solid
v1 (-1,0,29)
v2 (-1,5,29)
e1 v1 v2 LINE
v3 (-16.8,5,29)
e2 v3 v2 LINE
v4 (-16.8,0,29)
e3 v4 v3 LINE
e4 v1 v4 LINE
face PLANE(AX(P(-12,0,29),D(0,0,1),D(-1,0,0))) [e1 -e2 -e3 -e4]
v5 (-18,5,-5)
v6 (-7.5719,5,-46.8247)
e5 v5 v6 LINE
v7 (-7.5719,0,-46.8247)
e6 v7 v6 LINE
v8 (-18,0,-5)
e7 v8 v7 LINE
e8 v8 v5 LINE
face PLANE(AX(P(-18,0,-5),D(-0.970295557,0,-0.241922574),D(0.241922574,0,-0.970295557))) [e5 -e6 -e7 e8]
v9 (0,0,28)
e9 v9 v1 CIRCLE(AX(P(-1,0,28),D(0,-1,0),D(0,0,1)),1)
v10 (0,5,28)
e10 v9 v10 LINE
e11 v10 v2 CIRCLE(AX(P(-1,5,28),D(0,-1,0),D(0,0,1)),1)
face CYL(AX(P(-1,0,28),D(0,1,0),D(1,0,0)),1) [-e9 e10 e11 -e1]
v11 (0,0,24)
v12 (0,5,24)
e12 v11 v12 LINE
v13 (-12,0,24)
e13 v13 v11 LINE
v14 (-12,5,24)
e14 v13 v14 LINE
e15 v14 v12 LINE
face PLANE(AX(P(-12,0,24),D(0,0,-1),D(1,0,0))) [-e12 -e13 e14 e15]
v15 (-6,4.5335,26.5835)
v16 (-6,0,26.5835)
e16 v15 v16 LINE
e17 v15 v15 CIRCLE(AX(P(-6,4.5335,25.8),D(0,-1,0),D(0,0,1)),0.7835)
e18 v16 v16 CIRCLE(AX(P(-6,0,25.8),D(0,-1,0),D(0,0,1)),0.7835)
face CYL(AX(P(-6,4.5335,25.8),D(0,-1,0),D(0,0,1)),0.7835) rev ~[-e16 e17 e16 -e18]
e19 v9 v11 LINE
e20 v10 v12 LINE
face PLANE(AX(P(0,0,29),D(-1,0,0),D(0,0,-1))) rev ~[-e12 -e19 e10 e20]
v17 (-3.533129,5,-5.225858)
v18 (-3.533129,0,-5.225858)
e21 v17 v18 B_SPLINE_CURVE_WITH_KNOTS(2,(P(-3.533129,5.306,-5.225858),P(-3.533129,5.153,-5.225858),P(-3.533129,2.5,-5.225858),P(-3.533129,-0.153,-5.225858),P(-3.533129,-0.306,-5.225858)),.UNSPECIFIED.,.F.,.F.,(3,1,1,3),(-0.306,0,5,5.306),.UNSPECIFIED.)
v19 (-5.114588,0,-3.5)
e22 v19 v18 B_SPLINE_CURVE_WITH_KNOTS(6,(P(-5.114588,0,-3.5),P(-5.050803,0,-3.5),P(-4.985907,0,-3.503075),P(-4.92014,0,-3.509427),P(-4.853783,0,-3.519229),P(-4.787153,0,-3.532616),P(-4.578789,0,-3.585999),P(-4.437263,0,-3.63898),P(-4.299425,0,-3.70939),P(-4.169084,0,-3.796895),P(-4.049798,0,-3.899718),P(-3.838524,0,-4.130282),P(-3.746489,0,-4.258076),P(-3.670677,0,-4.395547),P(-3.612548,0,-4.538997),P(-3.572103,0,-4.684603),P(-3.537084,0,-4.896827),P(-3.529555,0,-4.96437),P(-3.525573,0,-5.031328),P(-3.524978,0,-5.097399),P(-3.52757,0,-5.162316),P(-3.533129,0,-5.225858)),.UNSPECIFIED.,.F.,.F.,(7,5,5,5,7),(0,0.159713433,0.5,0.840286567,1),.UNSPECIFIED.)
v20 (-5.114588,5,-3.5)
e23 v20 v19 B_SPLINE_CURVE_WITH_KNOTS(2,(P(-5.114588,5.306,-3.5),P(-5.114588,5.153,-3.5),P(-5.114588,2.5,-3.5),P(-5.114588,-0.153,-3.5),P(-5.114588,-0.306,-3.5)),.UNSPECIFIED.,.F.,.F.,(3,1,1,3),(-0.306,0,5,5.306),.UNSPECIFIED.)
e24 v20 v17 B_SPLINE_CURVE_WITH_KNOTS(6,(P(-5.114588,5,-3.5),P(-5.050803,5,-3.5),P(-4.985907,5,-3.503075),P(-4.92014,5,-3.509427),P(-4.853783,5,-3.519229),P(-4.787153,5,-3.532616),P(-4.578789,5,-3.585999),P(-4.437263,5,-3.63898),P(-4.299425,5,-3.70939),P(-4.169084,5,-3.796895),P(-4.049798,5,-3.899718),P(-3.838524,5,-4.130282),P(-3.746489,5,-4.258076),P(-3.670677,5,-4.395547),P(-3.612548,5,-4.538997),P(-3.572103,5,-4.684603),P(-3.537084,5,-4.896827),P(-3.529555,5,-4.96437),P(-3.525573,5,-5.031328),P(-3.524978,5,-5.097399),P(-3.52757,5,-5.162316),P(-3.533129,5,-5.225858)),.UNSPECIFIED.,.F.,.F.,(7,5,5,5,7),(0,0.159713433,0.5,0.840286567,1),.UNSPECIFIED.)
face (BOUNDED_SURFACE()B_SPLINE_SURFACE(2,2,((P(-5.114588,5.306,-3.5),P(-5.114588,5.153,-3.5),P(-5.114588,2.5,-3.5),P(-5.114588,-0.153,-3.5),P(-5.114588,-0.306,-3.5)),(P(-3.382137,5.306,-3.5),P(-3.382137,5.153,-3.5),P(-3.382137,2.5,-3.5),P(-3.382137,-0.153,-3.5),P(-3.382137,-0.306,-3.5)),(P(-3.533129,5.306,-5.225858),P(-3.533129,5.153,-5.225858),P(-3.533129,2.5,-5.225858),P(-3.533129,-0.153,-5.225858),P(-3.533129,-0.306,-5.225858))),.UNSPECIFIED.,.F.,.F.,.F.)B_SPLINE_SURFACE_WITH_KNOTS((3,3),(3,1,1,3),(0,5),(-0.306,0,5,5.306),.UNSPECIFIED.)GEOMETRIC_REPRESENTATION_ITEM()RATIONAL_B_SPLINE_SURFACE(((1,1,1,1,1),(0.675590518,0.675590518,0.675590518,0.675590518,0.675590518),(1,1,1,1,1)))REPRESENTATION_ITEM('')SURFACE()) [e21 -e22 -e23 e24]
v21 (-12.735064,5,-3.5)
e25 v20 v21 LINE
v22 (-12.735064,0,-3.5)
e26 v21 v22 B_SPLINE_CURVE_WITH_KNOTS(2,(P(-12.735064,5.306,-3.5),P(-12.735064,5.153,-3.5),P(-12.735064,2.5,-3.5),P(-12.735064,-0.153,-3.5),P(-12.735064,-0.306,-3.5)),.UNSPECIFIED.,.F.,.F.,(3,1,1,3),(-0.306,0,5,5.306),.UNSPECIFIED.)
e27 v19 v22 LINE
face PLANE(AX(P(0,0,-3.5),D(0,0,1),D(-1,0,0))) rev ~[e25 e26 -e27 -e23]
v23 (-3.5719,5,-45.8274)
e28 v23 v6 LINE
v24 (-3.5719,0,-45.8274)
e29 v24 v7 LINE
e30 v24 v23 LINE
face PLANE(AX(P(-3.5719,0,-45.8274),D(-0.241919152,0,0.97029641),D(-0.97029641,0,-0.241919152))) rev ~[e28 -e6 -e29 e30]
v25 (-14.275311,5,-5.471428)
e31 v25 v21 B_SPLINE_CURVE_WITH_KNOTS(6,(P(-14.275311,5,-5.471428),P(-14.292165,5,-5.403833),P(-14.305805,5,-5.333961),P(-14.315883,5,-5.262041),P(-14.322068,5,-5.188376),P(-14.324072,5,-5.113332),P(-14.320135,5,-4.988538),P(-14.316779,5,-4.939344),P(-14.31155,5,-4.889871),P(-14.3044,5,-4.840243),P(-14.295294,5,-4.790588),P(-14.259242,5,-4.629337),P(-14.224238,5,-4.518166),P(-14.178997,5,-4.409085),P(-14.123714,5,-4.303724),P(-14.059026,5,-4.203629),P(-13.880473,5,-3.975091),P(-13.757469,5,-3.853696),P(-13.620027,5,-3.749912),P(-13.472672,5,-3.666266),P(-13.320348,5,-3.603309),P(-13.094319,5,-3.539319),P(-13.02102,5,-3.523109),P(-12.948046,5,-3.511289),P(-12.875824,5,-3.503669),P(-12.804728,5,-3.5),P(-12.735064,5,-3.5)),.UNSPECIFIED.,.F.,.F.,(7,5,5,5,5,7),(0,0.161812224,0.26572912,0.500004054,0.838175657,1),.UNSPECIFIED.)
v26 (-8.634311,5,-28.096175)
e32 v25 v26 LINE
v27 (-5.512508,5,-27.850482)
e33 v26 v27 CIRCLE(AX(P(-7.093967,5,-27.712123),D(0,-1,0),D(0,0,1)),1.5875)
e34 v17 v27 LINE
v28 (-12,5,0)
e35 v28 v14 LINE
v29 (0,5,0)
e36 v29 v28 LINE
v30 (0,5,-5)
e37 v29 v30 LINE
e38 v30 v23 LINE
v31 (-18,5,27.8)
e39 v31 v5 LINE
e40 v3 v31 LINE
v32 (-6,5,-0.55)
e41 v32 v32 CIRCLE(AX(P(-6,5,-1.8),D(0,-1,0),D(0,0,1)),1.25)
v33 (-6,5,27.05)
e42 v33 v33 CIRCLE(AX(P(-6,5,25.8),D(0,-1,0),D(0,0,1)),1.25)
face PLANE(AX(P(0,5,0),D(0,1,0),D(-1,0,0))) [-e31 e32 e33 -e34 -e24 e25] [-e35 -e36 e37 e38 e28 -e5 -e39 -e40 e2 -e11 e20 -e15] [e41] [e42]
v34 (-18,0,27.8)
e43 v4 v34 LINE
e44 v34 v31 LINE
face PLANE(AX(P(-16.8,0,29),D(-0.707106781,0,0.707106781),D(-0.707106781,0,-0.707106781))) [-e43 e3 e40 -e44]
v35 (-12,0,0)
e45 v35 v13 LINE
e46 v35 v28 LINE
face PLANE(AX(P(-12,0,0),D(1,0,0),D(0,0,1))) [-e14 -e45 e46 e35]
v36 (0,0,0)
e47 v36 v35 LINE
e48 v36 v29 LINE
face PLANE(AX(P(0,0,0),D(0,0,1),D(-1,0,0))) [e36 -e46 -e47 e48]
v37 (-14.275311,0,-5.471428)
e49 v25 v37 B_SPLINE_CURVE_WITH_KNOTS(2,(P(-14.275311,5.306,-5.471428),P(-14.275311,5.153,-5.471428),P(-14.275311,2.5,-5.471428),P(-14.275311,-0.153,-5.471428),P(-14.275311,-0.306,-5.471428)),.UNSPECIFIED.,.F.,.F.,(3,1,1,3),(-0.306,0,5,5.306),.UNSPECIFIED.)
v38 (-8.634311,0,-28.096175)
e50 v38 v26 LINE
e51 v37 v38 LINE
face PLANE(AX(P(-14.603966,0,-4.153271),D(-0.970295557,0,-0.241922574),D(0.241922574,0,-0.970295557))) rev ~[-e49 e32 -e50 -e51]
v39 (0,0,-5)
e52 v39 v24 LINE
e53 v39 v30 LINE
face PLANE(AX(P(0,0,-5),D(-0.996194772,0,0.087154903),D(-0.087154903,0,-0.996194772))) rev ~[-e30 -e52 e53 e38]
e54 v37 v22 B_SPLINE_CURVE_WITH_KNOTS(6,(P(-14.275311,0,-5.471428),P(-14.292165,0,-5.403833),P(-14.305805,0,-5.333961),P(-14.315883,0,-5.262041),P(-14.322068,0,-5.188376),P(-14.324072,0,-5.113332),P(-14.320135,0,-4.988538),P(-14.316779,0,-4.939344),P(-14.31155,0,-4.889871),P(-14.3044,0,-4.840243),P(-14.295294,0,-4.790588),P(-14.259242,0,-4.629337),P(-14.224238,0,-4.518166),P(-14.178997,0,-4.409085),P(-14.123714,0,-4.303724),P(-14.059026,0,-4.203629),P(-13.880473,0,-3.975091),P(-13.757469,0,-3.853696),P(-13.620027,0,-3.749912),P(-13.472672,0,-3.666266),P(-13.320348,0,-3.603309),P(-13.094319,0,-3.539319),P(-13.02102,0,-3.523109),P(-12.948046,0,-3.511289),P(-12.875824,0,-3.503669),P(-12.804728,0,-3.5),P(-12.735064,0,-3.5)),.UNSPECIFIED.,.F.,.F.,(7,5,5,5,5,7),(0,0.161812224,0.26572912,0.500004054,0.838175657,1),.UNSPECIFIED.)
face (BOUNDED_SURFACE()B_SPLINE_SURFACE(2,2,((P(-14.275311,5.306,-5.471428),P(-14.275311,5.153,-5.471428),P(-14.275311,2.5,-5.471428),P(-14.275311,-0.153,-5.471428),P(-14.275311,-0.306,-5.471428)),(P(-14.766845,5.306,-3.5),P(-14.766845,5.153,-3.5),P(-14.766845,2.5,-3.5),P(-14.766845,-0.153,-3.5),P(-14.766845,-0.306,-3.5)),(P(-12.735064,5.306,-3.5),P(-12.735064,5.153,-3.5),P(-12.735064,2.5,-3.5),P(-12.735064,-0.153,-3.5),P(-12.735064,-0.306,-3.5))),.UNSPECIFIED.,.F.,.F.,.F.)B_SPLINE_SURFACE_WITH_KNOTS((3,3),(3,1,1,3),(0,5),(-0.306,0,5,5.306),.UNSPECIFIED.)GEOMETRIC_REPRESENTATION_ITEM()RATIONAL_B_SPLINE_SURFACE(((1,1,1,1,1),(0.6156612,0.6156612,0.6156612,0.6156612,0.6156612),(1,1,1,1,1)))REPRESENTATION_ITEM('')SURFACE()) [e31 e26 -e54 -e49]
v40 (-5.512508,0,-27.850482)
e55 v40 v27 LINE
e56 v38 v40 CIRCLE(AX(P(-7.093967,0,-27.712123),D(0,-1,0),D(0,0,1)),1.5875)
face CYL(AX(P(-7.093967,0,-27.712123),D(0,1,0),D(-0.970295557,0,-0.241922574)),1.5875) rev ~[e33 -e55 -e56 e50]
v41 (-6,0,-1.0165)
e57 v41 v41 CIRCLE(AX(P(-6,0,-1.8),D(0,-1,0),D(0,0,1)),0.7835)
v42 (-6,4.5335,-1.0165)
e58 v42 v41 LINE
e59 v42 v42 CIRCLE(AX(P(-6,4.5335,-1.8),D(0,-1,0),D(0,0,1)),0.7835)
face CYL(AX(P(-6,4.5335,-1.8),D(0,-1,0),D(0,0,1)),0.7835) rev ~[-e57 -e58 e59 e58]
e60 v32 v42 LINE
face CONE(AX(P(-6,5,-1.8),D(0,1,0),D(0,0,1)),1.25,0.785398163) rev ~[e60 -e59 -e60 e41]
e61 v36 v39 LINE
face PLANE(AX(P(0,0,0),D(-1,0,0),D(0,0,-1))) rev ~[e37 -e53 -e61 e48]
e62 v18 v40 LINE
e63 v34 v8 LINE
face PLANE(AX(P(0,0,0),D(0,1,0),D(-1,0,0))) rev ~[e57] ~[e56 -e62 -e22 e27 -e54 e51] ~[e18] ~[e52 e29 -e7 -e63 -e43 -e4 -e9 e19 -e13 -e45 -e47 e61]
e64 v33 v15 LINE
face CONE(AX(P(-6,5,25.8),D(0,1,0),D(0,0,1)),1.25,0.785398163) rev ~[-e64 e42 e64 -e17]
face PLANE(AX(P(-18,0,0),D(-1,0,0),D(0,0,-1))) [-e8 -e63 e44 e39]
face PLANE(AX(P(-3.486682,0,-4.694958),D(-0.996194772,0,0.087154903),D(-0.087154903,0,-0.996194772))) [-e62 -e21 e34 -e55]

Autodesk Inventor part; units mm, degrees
ref_plane "YZ Plane" through (0, 0, 0) normal (1, 0, 0) x (0, 1, 0)
ref_plane "XZ Plane" through (0, 0, 0) normal (0, 1, 0) x (-1, 0, 0)
ref_plane "XY Plane" through (0, 0, 0) normal (0, 0, 1) x (1, 0, 0)
sketch "Sketch1" plane through (0, 0, 0) normal (0, 1, 0) x (-1, 0, 0)
  line L0 (0, 0) -> (18, 0)
  line L1 (0, 0) -> (0, -5)
  line L2 (0, -5) -> (3.5719, -45.8274)
  line L3 (18, 0) -> (18, -5)
  line L4 (18, -5) -> (7.5719, -46.8247)
  line L5 (3.5719, -45.8274) -> (7.5719, -46.8247)
  dimension "d0" = 18
  dimension "d1" = 5
  dimension "d3" = 175
  dimension "d6" = 76
  dimension "d7" = 4
extrude "Extrusion1" add sketch "Sketch1" along normal blind 5
shell "Shell1" thickness 3.5 removed faces 2 at (-7.1906, 5, -18.6091) at (-7.1906, 0, -18.6091)
fillet "Fillet1" radius 1.5875 5 edges at (-3.5, 2.5, -4.8472) (-6.3393, 2.5, -37.3009) (-3.5, 2.5, -3.5) (-14.5, 2.5, -3.5) (-14.5, 2.5, -4.5703)
sketch "Sketch2" plane through (0, 0, 0) normal (0, -1, 0) x (1, 0, 0)
  line L0 (0, 0) -> (-12, 0)
  line L1 (-12, 0) -> (-12, 24)
  line L2 (-12, 24) -> (0, 24)
  line L3 (0, 24) -> (0, 0)
  line L4 (0, 24) -> (-12, 24)
  line L5 (-12, 24) -> (-12, 29)
  line L6 (-12, 29) -> (0, 29)
  line L7 (0, 29) -> (0, 24)
  line L8 (-12, 0) -> (-18, 0)
  line L9 (-18, 0) -> (-18, 24)
  line L10 (-18, 24) -> (-12, 24)
  line L11 (-12, 24) -> (-12, 0)
  line L12 (-18, 24) -> (-13.7574, 24) construction
  line L13 (-12, 29) -> (-16.8, 29)
  line L14 (-16.8, 29) -> (-18, 27.8)
  line L15 (-18, 27.8) -> (-18, 24)
  dimension "d14" = 24
  dimension "d15" = 5
  dimension "d16" = 12
  dimension "d18" = 6
  dimension "d57" = 1.2
  dimension "d58" = 135
extrude "Extrusion2" add sketch "Sketch2" against normal blind 5 contours L8 L9 L10 L1 | L2 L5 L6 L7 | L10 L15 L14 L13 L5
fillet "Fillet3" radius 1 1 edges at (0, 2.5, 29)
sketch "Sketch4" plane through (0, 5, 0) normal (0, 1, 0) x (1, 0, 0)
  line L0 (-12, -24) -> (-12, 0) projected
  line L1 (-12, -12) -> (-18, -12)
  line L2 (-18, 5) -> (-18, -29) projected
  line L3 (0, -24) -> (-12, -24) projected
  line L4 (-12, 0) -> (0, 0) projected
  circle A0 centre (-6, -25.8) radius 0.8
  circle A1 centre (-6, 1.8) radius 0.8
  line L5 (0, -28) -> (0, -24) projected
  point P0 (-18, 1.9304)
  point P1 (-18, -27.8)
  point P2 (-16.8, -29)
  dimension "d31" = 1.6
  dimension "d32" = 27.6
  dimension "d43" = 6
  dimension "d46" = 13.8
hole "Hole1" at (-6, 5, 25.8) at (-6, 5, -1.8) direction (0, -1, 0) diameter 1.567 depth 10 countersink diameter 2.5 countersink angle 90 thread size "M2x0.4" class "6H" standard "ISO Metric profile"
properties part number "rapoukLegv9" material "EN AW-6060 T6"
